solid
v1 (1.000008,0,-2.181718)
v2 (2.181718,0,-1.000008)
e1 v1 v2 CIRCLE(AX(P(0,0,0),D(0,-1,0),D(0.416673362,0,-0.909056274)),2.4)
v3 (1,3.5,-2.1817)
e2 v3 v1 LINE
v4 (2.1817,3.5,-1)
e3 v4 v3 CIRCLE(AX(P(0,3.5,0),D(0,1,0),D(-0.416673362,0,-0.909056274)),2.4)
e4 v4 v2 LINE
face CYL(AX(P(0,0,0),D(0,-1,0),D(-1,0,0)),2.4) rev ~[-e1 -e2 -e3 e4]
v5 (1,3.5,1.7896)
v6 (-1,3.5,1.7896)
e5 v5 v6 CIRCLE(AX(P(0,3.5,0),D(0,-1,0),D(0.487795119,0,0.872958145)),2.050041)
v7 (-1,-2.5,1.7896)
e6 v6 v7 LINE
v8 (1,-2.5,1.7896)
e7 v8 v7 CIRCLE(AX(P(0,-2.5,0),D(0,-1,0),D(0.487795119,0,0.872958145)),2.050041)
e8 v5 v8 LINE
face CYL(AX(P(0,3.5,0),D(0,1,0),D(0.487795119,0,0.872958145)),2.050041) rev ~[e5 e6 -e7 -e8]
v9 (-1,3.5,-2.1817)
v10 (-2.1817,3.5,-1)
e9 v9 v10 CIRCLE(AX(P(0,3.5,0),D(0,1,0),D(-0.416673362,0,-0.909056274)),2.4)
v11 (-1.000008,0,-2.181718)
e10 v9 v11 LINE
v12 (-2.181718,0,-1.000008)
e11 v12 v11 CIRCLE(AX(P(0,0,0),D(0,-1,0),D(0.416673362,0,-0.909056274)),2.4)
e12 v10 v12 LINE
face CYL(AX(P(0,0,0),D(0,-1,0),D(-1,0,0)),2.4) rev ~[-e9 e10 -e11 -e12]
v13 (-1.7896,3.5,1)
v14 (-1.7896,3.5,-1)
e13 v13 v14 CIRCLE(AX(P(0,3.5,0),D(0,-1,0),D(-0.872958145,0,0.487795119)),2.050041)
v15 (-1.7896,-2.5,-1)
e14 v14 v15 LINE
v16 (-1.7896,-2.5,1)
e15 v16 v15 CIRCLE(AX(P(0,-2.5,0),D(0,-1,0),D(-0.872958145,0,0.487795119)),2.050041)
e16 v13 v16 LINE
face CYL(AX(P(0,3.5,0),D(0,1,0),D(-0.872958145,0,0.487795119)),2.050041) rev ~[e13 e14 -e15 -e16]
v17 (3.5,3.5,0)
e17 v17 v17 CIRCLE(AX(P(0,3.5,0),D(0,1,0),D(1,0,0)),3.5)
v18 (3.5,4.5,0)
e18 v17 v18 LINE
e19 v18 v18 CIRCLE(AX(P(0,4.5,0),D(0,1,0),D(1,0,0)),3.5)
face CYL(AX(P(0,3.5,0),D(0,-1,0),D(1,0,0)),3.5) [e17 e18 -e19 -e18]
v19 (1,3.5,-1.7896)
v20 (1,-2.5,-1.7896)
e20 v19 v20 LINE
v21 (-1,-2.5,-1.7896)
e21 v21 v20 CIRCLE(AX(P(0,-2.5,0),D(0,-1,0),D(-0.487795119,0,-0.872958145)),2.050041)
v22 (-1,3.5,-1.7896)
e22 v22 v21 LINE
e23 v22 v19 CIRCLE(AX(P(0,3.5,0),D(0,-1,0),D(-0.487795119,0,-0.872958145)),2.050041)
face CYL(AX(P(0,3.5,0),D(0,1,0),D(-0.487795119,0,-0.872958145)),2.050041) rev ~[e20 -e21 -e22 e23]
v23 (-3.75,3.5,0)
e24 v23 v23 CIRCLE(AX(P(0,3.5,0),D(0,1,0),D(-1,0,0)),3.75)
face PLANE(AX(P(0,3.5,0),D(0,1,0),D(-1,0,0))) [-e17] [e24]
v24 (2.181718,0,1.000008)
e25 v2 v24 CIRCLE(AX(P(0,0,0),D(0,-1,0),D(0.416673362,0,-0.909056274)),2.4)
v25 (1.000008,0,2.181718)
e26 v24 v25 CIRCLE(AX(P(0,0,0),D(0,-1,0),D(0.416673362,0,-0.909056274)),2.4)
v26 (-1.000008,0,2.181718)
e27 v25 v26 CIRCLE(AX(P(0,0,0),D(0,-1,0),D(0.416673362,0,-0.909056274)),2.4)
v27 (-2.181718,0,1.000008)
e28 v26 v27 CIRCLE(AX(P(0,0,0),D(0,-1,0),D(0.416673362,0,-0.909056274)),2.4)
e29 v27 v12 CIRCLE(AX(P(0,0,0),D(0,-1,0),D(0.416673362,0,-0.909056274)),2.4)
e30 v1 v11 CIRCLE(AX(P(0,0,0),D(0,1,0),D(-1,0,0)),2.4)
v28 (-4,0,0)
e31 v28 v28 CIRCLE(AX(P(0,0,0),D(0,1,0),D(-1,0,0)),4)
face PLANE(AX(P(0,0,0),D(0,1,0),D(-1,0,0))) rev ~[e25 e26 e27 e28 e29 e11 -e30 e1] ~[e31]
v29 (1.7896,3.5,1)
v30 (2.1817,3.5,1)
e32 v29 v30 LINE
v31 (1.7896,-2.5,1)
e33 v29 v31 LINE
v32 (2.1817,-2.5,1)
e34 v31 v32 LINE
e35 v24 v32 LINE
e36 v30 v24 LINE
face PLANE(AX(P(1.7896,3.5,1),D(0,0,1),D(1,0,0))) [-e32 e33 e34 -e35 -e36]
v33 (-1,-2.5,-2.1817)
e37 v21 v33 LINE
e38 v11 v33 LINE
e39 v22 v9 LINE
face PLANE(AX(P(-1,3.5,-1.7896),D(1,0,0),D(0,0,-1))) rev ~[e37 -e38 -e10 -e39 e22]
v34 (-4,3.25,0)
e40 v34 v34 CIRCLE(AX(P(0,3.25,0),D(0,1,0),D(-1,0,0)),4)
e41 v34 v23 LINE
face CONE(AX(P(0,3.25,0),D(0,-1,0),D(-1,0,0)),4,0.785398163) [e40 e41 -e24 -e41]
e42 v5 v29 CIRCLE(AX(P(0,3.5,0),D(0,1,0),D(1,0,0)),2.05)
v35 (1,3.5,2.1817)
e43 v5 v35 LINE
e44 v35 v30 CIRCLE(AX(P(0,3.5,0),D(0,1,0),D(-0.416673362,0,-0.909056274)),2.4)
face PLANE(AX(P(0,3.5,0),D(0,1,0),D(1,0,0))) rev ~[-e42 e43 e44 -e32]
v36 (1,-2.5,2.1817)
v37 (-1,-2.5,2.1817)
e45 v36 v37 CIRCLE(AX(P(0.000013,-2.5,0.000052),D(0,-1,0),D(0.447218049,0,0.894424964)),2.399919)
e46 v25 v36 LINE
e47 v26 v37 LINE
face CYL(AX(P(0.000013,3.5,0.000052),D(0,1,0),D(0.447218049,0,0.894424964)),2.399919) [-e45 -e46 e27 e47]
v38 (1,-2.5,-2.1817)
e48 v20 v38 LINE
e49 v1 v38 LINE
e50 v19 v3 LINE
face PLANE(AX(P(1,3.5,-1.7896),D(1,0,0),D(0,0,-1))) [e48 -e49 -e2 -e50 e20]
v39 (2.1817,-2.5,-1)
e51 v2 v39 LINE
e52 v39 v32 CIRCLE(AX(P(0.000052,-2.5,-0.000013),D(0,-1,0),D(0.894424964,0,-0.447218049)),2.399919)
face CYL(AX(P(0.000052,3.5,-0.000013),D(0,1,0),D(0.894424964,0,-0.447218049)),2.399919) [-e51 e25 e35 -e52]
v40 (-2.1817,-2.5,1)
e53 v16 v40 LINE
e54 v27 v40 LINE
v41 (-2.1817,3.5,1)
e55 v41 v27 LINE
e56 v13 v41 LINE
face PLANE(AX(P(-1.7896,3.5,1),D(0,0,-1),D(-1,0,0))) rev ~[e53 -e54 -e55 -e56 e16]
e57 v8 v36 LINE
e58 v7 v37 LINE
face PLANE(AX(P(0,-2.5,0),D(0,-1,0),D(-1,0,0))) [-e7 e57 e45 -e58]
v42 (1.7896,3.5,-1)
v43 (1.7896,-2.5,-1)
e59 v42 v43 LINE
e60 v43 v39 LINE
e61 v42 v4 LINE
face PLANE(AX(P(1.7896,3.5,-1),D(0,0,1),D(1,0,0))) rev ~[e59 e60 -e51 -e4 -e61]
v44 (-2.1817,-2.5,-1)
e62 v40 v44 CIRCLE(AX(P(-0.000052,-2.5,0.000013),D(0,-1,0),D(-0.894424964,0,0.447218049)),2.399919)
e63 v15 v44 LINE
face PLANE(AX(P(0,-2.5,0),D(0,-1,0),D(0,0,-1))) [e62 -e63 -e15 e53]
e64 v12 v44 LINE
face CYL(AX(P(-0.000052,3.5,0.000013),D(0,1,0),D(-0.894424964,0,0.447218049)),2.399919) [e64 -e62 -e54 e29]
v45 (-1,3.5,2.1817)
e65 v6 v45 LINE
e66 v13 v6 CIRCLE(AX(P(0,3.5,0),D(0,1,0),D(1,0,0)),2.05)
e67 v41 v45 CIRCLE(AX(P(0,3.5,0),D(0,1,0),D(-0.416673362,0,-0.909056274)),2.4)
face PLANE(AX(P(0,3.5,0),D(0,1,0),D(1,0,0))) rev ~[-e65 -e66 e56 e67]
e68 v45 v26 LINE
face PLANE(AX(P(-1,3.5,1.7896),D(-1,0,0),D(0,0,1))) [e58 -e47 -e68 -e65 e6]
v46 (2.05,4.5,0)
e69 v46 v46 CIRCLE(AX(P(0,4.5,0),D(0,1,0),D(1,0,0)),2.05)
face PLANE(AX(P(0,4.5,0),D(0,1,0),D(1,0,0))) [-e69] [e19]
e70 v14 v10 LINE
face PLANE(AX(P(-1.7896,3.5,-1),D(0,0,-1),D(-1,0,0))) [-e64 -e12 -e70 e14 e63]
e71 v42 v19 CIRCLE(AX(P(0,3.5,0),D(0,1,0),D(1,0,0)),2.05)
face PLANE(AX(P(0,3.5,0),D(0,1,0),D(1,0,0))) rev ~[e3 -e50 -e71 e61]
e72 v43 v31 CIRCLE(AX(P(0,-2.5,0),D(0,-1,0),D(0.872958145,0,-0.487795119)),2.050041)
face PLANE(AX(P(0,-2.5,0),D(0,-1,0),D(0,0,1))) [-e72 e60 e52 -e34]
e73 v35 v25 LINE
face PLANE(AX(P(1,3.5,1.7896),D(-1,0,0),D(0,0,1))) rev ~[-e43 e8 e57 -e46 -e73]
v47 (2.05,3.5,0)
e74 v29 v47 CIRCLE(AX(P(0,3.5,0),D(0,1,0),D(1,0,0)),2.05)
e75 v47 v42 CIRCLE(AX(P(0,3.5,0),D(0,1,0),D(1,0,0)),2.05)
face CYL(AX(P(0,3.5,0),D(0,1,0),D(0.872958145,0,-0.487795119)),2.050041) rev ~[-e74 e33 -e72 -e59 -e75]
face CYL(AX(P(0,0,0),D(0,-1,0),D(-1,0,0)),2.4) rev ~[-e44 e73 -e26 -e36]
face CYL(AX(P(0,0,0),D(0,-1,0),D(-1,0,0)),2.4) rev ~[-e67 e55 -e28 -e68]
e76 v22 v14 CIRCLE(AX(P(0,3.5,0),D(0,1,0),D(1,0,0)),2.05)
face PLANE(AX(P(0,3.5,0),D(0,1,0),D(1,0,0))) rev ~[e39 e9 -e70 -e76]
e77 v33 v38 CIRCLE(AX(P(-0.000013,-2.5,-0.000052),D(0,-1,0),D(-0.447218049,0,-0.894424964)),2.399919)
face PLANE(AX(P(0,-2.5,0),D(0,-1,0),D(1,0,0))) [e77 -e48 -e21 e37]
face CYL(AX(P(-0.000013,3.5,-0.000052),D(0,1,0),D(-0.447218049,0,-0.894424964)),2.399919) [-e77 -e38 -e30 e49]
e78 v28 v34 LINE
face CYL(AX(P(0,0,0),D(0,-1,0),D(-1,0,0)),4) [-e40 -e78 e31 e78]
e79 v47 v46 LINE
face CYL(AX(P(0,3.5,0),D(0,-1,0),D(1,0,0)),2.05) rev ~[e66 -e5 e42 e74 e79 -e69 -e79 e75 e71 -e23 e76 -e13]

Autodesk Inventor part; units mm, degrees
ref_plane "YZ Plane" through (0, 0, 0) normal (1, 0, 0) x (0, 1, 0)
ref_plane "XZ Plane" through (0, 0, 0) normal (0, 1, 0) x (-1, 0, 0)
ref_plane "XY Plane" through (0, 0, 0) normal (0, 0, 1) x (1, 0, 0)
sketch "Sketch1" plane through (0, 0, 0) normal (0, 1, 0) x (-1, 0, 0)
  circle A0 centre (0, 0) radius 2.4
  circle A1 centre (0, 0) radius 4
  dimension "d0" = 8
  dimension "d1" = 4.8
extrude "Extrusion1" add sketch "Sketch1" along normal blind 3.5
chamfer "Chamfer1" distance 0.25 angle 45 1 edges at (4, 3.5, 0)
sketch "Sketch2" plane through (0, 3.5, 0) normal (0, 1, 0) x (1, 0, 0)
  circle A0 centre (0, 0) radius 2.05
  circle A1 centre (0, 0) radius 3.5
  dimension "d7" = 4.1
  dimension "d8" = 7
extrude "Extrusion2" add sketch "Sketch2" along normal blind 1
sketch "Sketch3" plane through (0, 3.5, 0) normal (0, -1, 0) x (1, 0, 0)
  arc A0 (-1.0733, -2.1466) -> (1, -2.1817) centre (0, 0) ccw
  arc A1 (-1, -1.7896) -> (1, -1.7896) centre (0, 0) ccw
  line L0 (-1, -1.7896) -> (-1, -2.1817)
  line L1 (1, -1.7896) -> (1, -2.1817)
  line L2 (0, 0) -> (0, -5.6159) construction
  dimension "d11" = 2.05
  dimension "d13" = 2.4
  dimension "d14" = 2
extrude "Extrusion3" add sketch "Sketch3" along normal blind 6
pattern_circular "Circular Pattern1" count 4 over 360 about axis through (0, -10, 0) along (0, 1, 0) of "Extrusion3"
properties part number "Collet" material "Acetal Resin, Black"
